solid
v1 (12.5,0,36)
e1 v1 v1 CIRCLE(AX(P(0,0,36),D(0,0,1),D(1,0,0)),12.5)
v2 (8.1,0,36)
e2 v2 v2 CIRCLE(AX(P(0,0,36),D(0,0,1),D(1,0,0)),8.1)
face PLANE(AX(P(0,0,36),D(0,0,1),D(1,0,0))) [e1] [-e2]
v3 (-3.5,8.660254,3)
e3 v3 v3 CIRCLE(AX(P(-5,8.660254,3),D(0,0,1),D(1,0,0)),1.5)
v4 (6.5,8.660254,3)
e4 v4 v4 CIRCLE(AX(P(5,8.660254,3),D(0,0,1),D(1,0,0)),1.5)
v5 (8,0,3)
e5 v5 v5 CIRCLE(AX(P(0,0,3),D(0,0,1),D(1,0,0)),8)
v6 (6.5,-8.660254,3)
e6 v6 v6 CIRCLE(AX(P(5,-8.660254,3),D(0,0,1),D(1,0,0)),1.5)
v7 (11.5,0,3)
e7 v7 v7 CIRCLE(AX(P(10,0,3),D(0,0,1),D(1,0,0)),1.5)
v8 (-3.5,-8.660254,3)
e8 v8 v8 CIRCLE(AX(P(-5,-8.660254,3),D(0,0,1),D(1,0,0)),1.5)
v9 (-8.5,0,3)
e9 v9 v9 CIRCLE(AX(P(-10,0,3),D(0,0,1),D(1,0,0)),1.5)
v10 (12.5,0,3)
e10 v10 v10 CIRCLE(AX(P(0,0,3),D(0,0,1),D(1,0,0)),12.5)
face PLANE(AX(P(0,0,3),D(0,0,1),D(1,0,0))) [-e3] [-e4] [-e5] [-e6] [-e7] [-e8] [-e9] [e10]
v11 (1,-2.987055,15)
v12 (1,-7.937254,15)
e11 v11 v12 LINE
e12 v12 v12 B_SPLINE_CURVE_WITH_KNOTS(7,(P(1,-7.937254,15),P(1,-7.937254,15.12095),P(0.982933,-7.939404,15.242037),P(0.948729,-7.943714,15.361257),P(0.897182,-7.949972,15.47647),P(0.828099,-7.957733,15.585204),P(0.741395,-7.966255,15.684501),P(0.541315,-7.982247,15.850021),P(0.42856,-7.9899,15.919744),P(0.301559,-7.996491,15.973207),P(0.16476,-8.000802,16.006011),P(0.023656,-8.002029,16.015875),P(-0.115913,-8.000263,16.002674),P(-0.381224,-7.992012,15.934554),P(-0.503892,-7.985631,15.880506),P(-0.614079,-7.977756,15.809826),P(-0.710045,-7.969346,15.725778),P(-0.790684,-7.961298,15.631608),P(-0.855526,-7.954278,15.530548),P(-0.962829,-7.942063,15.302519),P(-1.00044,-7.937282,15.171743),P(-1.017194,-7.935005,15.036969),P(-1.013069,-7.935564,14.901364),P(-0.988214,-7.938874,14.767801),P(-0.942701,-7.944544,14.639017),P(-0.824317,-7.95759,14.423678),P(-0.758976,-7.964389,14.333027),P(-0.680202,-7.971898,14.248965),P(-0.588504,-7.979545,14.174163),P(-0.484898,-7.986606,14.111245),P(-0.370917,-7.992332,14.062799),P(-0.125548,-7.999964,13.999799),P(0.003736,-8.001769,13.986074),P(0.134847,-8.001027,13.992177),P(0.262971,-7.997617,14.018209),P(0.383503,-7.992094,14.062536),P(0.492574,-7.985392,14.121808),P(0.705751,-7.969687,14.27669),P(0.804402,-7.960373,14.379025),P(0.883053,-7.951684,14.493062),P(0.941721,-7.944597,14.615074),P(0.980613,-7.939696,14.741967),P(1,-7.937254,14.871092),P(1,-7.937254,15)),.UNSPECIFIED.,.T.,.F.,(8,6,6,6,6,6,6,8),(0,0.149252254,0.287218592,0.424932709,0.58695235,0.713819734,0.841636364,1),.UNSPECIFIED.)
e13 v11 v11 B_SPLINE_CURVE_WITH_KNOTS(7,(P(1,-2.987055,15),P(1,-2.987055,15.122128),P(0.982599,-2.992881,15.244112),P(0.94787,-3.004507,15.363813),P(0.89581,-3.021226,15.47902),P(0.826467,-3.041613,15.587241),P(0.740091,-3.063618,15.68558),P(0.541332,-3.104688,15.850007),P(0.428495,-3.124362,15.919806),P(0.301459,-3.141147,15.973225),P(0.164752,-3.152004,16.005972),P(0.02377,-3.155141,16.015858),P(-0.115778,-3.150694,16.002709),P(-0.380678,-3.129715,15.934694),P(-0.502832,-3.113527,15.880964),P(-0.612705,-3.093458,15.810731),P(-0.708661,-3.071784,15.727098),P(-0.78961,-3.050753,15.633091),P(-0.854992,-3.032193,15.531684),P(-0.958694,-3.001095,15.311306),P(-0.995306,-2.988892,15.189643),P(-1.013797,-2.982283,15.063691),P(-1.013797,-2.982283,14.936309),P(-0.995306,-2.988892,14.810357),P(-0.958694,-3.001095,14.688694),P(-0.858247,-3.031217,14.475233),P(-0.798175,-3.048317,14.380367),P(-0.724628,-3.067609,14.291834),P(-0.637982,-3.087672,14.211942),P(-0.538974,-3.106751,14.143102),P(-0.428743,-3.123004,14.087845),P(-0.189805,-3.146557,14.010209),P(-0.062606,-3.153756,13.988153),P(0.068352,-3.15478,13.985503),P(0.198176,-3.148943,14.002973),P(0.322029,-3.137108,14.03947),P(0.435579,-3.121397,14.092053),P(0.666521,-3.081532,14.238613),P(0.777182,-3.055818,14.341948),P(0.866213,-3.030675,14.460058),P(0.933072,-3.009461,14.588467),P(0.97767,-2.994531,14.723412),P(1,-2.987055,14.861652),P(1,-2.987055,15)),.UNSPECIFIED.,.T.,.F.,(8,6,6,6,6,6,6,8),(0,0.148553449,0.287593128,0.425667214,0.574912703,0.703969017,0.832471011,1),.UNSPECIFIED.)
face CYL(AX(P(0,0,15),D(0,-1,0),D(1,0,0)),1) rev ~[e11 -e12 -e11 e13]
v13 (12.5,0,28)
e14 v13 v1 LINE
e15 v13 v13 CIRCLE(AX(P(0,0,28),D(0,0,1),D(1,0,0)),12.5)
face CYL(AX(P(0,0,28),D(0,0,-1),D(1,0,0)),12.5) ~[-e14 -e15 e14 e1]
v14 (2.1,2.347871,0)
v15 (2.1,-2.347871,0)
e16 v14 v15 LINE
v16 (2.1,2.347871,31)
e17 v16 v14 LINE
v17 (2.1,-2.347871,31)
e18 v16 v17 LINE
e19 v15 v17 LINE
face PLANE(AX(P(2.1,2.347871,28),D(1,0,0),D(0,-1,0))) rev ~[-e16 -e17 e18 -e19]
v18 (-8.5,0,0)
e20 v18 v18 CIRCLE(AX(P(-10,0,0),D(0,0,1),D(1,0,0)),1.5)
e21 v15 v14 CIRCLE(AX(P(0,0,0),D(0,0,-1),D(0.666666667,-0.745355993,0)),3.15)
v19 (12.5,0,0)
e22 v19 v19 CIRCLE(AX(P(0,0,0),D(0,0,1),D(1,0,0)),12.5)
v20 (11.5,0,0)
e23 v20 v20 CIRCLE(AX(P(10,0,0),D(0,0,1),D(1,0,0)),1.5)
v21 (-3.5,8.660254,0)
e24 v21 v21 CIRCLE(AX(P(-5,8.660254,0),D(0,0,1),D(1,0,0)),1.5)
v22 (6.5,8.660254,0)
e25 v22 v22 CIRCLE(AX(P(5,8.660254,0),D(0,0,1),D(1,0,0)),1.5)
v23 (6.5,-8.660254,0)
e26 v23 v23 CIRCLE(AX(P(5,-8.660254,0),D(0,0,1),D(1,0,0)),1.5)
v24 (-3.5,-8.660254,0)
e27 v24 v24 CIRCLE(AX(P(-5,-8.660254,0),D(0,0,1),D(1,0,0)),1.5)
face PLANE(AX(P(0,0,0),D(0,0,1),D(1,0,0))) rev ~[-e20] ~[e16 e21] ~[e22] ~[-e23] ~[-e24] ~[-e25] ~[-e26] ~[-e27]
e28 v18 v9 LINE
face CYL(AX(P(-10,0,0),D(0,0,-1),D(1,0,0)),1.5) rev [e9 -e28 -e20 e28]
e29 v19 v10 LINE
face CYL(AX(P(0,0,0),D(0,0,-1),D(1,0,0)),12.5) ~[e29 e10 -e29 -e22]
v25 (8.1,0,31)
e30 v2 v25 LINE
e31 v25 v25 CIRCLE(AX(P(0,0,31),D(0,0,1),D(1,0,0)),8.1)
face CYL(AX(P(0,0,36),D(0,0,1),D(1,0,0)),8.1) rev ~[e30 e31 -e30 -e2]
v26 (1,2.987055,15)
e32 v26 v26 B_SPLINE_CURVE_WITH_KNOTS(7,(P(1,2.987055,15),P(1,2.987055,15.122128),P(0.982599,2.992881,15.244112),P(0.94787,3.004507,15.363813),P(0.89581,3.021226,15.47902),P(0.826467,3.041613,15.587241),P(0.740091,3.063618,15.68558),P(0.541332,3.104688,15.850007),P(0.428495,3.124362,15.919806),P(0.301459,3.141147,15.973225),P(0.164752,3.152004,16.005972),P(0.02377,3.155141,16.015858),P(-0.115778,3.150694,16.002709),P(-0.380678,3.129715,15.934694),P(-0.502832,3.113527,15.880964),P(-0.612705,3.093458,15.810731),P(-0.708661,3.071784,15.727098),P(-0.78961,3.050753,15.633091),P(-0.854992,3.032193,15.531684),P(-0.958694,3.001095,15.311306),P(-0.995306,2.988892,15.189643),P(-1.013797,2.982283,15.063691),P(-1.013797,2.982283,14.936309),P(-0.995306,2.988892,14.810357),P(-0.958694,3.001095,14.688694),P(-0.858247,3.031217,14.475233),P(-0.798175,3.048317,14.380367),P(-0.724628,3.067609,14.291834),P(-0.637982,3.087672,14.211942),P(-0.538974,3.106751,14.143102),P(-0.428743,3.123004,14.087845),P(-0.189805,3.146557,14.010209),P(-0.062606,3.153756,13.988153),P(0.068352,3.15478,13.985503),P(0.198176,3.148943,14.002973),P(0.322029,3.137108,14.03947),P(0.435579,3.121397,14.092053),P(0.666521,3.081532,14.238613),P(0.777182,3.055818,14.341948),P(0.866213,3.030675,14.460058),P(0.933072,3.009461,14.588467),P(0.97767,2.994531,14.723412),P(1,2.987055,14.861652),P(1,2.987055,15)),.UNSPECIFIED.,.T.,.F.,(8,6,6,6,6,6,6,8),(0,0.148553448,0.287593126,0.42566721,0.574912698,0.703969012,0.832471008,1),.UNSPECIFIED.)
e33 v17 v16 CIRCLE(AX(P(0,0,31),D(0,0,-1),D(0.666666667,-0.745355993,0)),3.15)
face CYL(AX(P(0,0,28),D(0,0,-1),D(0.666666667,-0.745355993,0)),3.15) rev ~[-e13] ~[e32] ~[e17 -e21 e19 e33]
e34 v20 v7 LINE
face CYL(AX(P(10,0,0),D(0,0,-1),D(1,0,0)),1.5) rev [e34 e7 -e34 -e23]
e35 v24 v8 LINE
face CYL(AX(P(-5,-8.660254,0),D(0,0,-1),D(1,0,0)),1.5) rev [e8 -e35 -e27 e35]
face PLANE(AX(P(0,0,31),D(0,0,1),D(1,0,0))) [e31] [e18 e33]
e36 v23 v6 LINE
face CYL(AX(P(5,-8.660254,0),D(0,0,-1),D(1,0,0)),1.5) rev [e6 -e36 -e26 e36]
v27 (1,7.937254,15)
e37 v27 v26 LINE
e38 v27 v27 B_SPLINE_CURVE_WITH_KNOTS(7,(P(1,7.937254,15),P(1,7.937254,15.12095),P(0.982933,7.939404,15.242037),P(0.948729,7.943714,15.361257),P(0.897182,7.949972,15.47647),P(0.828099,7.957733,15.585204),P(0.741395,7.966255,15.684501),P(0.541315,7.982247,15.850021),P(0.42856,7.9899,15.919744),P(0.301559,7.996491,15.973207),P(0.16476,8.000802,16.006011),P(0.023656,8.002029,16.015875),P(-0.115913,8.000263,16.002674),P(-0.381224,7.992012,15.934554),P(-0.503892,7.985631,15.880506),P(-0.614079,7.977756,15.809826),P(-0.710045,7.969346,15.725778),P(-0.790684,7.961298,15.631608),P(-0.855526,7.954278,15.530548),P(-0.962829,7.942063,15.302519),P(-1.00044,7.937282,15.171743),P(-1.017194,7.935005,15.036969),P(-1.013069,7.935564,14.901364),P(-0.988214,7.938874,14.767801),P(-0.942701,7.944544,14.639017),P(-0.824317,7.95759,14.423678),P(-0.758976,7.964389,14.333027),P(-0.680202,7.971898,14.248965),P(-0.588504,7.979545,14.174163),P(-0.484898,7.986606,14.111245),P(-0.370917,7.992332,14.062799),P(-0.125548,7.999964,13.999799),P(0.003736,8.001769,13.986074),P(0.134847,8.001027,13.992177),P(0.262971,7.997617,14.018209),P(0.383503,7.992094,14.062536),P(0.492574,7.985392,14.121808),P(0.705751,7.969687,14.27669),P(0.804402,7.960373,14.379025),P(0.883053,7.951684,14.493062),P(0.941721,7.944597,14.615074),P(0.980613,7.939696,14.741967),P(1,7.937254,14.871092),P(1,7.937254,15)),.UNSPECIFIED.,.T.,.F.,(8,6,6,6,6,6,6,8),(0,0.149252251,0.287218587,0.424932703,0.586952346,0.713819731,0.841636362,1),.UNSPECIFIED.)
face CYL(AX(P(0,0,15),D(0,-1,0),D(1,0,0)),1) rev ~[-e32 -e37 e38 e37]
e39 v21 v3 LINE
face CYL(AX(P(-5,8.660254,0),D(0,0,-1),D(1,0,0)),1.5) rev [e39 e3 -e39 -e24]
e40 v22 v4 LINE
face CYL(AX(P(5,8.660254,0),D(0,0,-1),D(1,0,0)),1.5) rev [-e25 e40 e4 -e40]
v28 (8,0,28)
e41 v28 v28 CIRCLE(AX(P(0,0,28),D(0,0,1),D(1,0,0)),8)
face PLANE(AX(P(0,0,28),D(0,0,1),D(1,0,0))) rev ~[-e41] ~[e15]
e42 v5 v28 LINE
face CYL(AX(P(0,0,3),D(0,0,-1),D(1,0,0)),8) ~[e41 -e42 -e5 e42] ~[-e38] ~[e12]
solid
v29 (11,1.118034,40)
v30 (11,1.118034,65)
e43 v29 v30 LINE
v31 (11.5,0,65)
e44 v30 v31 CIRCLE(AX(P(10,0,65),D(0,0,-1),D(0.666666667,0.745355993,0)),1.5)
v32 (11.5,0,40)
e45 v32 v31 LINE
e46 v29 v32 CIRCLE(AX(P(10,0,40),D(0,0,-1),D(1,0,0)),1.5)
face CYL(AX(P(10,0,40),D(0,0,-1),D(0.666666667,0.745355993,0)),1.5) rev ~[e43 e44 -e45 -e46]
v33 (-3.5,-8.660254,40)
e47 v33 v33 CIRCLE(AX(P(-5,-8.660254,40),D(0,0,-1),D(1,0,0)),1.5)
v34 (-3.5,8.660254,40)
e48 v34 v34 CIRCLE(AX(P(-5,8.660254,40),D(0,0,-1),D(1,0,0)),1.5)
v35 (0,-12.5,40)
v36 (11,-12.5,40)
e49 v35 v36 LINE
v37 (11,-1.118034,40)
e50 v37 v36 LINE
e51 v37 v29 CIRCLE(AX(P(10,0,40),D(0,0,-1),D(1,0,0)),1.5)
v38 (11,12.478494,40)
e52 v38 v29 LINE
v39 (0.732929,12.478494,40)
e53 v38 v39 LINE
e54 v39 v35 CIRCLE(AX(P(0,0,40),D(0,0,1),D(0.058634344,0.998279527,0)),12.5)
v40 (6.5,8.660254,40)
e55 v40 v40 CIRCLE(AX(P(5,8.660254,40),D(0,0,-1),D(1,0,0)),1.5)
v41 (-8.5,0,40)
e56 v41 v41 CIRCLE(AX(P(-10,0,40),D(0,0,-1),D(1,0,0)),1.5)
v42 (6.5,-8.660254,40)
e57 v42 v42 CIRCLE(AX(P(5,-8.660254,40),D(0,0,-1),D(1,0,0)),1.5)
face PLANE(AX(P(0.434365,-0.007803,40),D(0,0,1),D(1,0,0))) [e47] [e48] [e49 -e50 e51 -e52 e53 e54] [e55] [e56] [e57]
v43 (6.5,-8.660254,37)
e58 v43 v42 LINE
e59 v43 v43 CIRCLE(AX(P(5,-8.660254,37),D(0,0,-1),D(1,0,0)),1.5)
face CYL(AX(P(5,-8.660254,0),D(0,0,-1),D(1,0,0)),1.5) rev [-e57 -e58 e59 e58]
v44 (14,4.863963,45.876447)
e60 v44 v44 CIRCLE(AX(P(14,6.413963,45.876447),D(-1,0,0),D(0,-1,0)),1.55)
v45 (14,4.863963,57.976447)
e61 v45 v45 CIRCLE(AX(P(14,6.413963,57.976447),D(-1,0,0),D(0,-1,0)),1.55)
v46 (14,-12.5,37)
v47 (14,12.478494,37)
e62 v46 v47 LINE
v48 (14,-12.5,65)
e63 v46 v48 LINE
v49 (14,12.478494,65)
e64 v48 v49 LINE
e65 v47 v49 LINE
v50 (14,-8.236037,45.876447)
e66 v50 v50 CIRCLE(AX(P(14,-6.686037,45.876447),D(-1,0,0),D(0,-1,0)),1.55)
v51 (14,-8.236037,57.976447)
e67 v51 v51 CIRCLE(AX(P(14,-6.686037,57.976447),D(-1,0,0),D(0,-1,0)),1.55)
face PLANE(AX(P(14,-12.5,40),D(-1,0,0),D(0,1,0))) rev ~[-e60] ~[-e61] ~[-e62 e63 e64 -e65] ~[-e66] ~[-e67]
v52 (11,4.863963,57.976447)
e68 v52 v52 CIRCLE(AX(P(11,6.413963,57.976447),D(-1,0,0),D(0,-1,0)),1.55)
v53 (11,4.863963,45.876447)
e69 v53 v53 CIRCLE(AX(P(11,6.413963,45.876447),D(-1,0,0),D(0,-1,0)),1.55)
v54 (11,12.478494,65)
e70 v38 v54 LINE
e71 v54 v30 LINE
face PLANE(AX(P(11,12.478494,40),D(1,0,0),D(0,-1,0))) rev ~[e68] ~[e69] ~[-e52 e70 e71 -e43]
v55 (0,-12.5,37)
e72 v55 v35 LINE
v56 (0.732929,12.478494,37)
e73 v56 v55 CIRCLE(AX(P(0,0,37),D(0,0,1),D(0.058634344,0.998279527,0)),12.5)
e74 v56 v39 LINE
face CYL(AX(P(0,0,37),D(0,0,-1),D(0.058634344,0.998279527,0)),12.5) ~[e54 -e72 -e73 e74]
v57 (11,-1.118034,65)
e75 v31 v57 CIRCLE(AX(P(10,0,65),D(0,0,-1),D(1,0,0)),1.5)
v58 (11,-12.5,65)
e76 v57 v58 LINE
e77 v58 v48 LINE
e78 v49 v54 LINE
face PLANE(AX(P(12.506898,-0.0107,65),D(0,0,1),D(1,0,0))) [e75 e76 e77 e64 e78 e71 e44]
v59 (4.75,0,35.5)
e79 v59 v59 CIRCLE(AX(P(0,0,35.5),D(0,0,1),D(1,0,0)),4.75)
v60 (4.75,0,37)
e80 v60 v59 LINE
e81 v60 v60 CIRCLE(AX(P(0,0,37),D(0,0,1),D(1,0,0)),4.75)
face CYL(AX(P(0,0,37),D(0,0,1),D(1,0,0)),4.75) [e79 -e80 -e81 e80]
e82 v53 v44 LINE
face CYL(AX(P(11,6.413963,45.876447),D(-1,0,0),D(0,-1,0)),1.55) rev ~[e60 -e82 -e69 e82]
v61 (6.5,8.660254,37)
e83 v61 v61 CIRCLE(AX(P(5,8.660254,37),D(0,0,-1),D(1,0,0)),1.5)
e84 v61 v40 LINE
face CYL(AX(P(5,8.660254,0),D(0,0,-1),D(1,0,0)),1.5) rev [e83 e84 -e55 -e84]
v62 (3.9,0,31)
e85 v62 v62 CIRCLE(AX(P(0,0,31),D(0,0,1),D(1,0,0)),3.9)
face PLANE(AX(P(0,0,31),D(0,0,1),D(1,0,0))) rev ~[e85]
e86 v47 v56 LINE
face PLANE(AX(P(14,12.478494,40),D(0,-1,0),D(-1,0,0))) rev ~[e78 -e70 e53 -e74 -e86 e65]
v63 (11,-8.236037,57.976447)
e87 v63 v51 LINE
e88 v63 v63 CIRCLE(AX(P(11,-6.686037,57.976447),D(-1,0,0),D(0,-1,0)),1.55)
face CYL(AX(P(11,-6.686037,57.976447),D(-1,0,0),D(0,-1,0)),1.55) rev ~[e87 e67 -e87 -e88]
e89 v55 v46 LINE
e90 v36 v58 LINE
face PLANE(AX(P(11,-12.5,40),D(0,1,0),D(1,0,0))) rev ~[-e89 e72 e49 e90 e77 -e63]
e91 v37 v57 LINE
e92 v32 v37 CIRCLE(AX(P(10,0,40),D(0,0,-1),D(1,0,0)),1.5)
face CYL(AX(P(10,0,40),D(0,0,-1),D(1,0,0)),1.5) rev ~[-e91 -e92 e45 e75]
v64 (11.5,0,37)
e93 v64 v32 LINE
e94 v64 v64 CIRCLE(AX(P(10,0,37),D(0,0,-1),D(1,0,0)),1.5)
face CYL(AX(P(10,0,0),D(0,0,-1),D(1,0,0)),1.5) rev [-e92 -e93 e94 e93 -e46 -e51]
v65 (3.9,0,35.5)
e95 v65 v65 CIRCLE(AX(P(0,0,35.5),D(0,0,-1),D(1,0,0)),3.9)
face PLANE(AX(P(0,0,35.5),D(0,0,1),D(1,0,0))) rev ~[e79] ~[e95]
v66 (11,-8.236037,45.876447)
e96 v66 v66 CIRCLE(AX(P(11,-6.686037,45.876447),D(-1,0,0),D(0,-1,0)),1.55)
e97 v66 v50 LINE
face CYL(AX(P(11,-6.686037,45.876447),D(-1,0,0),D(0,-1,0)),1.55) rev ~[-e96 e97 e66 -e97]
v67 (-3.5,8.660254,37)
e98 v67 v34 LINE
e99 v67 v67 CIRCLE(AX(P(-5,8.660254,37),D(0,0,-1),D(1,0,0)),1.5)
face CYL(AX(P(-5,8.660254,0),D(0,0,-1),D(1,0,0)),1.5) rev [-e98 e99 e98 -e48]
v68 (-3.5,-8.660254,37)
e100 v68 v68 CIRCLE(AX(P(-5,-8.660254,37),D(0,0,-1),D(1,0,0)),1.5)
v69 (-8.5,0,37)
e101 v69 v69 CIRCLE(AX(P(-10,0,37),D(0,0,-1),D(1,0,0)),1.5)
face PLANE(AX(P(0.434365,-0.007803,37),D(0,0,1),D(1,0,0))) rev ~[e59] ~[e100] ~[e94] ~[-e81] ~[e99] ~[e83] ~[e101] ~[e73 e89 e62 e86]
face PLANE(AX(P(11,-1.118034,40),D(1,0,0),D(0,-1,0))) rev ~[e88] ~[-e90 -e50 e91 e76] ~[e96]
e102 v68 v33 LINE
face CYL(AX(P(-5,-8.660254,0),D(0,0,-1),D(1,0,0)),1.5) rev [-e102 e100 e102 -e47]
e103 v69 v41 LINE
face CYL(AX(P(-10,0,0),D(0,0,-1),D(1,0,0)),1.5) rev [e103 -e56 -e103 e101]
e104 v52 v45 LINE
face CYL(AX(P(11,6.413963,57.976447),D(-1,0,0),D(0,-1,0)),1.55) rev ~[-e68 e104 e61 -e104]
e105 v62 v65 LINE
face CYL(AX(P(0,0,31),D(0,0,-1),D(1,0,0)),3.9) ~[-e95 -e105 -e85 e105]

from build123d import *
from build123d import SkipClean  # not in build123d's __all__

# Parameters (mm, degrees)
F0_R      = 12.5
F0_R_2    = 1.5
F1_DEPTH  = 3
F2_R      = 8
F3_DEPTH  = 25
F4_R      = 12.5
F4_R_2    = 8.1
F4_R_3    = 8
F5_DEPTH  = 8
F6_R      = 8.1
F7_DEPTH  = 5
F8_R      = 1
F9_DEPTH  = 40
F10_R     = 3.9
F11_DEPTH = 6
F12_R     = 4.75
F12_R_2   = 3.9
F13_DEPTH = 1.5
F14_R     = 4.75
F14_R_2   = 3.9
F15_DEPTH = 3
F16_DEPTH = 40.001
F18_DEPTH = 25
F19_R     = 1.55
F20_DEPTH = 25


# Not quite as in the source:
# - after a boolean that leaves OpenCascade's solid faulty, fix() repairs it
# - a feature names something its author has since deleted; it is built from what else it names


with BuildPart() as f1:
    # F0 (on Top) → F1 (new body)
    with BuildSketch(Plane.XY):
        Circle(F0_R)
        with Locations((-5, -8.6602540378)):
            Circle(F0_R_2, mode=Mode.SUBTRACT)
        with Locations((5, -8.6602540378)):
            Circle(F0_R_2, mode=Mode.SUBTRACT)
        with Locations((-10, 0)):
            Circle(F0_R_2, mode=Mode.SUBTRACT)
        with Locations((-5, 8.6602540378)):
            Circle(F0_R_2, mode=Mode.SUBTRACT)
        with BuildLine():
            ThreePointArc((2.1, 2.3478713764), (2.8755434269, 1.285982115), (3.15, 0))
            ThreePointArc((3.15, 0), (2.8755434269, -1.285982115), (2.1, -2.3478713764))
            ThreePointArc((2.1, -2.3478713764), (-3.15, 0), (2.1, 2.3478713764))
        make_face(mode=Mode.SUBTRACT)
        with Locations((10, 0)):
            Circle(F0_R_2, mode=Mode.SUBTRACT)
        with Locations((5, 8.6602540378)):
            Circle(F0_R_2, mode=Mode.SUBTRACT)
        with BuildLine():
            ThreePointArc((2.1, -2.3478713764), (2.8755434269, -1.285982115), (3.15, 0))
            ThreePointArc((3.15, 0), (2.8755434269, 1.285982115), (2.1, 2.3478713764))
            Line((2.1, 2.3478713764), (2.1, -2.3478713764))
        make_face()
    extrude(amount=F1_DEPTH)

    # F2 (on face) → F3 (join)
    with BuildSketch(Plane.XY.offset(3)):
        Circle(F2_R)
        with BuildLine():
            Line((2.1, 2.3478713764), (2.1, -2.3478713764))
            ThreePointArc((2.1, -2.3478713764), (-3.15, 0), (2.1, 2.3478713764))
        make_face(mode=Mode.SUBTRACT)
    extrude(amount=F3_DEPTH)

    # F4 (on face) → F5 (join)
    with BuildSketch(Plane.XY.offset(28)):
        Circle(F4_R)
        Circle(F4_R_2, mode=Mode.SUBTRACT)
        Circle(F4_R_2)
        Circle(F4_R_3, mode=Mode.SUBTRACT)
        Circle(F4_R_3)
        with BuildLine():
            ThreePointArc((2.1, -2.3478713764), (-3.15, 0), (2.1, 2.3478713764))
            Line((2.1, 2.3478713764), (2.1, -2.3478713764))
        make_face(mode=Mode.SUBTRACT)
    extrude(amount=F5_DEPTH)

    # F6 (on face) → F7 (cut)
    with BuildSketch(Plane.XY.offset(36)):
        Circle(F6_R)
        with BuildLine():
            ThreePointArc((2.1, -2.3478713764), (-3.15, 0), (2.1, 2.3478713764))
            Line((2.1, 2.3478713764), (2.1, -2.3478713764))
        make_face(mode=Mode.SUBTRACT)
    extrude(amount=-F7_DEPTH, mode=Mode.SUBTRACT)

    # F8 (on Front) → F9 (cut, symmetric)
    with BuildSketch(Plane.XZ):
        with Locations((0, 15)):
            Circle(F8_R)
    extrude(amount=F9_DEPTH, both=True, mode=Mode.SUBTRACT)


with BuildPart() as f11:
    # F10 (on face) → F11 (new body)
    with BuildSketch(Plane.XY.offset(31)):
        Circle(F10_R)
        with BuildLine():
            ThreePointArc((2.1, -2.3478713764), (-3.15, 0), (2.1, 2.3478713764))
            Line((2.1, 2.3478713764), (2.1, -2.3478713764))
        make_face(mode=Mode.SUBTRACT)
        with BuildLine():
            Line((2.1, -2.3478713764), (2.1, 2.3478713764))
            ThreePointArc((2.1, 2.3478713764), (-3.15, 0), (2.1, -2.3478713764))
        make_face()
    extrude(amount=F11_DEPTH)

    # F12 (on face) → F13 (join)
    with BuildSketch(Plane.XY.offset(37)):
        Circle(F12_R)
        Circle(F12_R_2, mode=Mode.SUBTRACT)
        Circle(F12_R_2)
    extrude(amount=-F13_DEPTH)

    # F14 (on face) → F15 (join)
    with BuildSketch(Plane.XY.offset(37)):
        with BuildLine():
            ThreePointArc((0.7329293017, 12.4784940854), (-12.4946223646, 0.3666223758), (0, -12.5))
            ThreePointArc((0, -12.5), (8.8388347648, -8.8388347648), (12.5, 0))
            ThreePointArc((12.5, 0), (9.0942733704, 8.5757910343), (0.7329293017, 12.4784940854))
        make_face()
        Circle(F14_R, mode=Mode.SUBTRACT)
        with BuildLine():
            ThreePointArc((12.5, 0), (8.8388347648, -8.8388347648), (0, -12.5))
            Line((0, -12.5), (14, -12.5))
            Line((14, -12.5), (14, 12.4784940854))
            Line((14, 12.4784940854), (0.7329293017, 12.4784940854))
            ThreePointArc((0.7329293017, 12.4784940854), (9.0942733704, 8.5757910343), (12.5, 0))
        make_face()
        Circle(F14_R)
        Circle(F14_R_2, mode=Mode.SUBTRACT)
        Circle(F14_R_2)
    extrude(amount=F15_DEPTH)

    # F0 (on Top) → F16 (cut, through all)
    with BuildSketch(Plane.XY):
        with Locations((-5, 8.6602540378)):
            Circle(F0_R_2)
        with Locations((5, 8.6602540378)):
            Circle(F0_R_2)
        with Locations((10, 0)):
            Circle(F0_R_2)
        with Locations((5, -8.6602540378)):
            Circle(F0_R_2)
        with Locations((-5, -8.6602540378)):
            Circle(F0_R_2)
        with Locations((-10, 0)):
            Circle(F0_R_2)
    extrude(amount=F16_DEPTH, mode=Mode.SUBTRACT)

    # F17 (on face) → F18 (join)
    with BuildSketch(Plane.XY.offset(40)):
        with BuildLine():
            Line((11, -12.5), (14, -12.5))
            Line((14, -12.5), (14, 12.4784940854))
            Line((14, 12.4784940854), (11, 12.4784940854))
            Line((11, 12.4784940854), (11, 1.1180339887))
            ThreePointArc((11, 1.1180339887), (11.3693063938, 0.6123724357), (11.5, 0))
            ThreePointArc((11.5, 0), (11.3693063938, -0.6123724357), (11, -1.1180339887))
            Line((11, -1.1180339887), (11, -12.5))
        make_face()
    with SkipClean():  # cleaning this boolean's faces spoils the solid; the shape is the same uncleaned
        extrude(amount=F18_DEPTH)

    # F19 (on face) → F20 (cut)
    with BuildSketch(Plane(origin=(11, 0, 0), x_dir=(0, -1, 0), z_dir=(-1, 0, 0))):
        with Locations((-6.413962692, 45.8764471114)):
            Circle(F19_R)
        with Locations((-6.413962692, 57.9764471114)):
            Circle(F19_R)
        with Locations((6.686037308, 45.8764471114)):
            Circle(F19_R)
        with Locations((6.686037308, 57.9764471114)):
            Circle(F19_R)
    extrude(amount=-F20_DEPTH, mode=Mode.SUBTRACT)

    add(f11.part.fix(), mode=Mode.REPLACE)


solid = Compound([f1.part, f11.part])
